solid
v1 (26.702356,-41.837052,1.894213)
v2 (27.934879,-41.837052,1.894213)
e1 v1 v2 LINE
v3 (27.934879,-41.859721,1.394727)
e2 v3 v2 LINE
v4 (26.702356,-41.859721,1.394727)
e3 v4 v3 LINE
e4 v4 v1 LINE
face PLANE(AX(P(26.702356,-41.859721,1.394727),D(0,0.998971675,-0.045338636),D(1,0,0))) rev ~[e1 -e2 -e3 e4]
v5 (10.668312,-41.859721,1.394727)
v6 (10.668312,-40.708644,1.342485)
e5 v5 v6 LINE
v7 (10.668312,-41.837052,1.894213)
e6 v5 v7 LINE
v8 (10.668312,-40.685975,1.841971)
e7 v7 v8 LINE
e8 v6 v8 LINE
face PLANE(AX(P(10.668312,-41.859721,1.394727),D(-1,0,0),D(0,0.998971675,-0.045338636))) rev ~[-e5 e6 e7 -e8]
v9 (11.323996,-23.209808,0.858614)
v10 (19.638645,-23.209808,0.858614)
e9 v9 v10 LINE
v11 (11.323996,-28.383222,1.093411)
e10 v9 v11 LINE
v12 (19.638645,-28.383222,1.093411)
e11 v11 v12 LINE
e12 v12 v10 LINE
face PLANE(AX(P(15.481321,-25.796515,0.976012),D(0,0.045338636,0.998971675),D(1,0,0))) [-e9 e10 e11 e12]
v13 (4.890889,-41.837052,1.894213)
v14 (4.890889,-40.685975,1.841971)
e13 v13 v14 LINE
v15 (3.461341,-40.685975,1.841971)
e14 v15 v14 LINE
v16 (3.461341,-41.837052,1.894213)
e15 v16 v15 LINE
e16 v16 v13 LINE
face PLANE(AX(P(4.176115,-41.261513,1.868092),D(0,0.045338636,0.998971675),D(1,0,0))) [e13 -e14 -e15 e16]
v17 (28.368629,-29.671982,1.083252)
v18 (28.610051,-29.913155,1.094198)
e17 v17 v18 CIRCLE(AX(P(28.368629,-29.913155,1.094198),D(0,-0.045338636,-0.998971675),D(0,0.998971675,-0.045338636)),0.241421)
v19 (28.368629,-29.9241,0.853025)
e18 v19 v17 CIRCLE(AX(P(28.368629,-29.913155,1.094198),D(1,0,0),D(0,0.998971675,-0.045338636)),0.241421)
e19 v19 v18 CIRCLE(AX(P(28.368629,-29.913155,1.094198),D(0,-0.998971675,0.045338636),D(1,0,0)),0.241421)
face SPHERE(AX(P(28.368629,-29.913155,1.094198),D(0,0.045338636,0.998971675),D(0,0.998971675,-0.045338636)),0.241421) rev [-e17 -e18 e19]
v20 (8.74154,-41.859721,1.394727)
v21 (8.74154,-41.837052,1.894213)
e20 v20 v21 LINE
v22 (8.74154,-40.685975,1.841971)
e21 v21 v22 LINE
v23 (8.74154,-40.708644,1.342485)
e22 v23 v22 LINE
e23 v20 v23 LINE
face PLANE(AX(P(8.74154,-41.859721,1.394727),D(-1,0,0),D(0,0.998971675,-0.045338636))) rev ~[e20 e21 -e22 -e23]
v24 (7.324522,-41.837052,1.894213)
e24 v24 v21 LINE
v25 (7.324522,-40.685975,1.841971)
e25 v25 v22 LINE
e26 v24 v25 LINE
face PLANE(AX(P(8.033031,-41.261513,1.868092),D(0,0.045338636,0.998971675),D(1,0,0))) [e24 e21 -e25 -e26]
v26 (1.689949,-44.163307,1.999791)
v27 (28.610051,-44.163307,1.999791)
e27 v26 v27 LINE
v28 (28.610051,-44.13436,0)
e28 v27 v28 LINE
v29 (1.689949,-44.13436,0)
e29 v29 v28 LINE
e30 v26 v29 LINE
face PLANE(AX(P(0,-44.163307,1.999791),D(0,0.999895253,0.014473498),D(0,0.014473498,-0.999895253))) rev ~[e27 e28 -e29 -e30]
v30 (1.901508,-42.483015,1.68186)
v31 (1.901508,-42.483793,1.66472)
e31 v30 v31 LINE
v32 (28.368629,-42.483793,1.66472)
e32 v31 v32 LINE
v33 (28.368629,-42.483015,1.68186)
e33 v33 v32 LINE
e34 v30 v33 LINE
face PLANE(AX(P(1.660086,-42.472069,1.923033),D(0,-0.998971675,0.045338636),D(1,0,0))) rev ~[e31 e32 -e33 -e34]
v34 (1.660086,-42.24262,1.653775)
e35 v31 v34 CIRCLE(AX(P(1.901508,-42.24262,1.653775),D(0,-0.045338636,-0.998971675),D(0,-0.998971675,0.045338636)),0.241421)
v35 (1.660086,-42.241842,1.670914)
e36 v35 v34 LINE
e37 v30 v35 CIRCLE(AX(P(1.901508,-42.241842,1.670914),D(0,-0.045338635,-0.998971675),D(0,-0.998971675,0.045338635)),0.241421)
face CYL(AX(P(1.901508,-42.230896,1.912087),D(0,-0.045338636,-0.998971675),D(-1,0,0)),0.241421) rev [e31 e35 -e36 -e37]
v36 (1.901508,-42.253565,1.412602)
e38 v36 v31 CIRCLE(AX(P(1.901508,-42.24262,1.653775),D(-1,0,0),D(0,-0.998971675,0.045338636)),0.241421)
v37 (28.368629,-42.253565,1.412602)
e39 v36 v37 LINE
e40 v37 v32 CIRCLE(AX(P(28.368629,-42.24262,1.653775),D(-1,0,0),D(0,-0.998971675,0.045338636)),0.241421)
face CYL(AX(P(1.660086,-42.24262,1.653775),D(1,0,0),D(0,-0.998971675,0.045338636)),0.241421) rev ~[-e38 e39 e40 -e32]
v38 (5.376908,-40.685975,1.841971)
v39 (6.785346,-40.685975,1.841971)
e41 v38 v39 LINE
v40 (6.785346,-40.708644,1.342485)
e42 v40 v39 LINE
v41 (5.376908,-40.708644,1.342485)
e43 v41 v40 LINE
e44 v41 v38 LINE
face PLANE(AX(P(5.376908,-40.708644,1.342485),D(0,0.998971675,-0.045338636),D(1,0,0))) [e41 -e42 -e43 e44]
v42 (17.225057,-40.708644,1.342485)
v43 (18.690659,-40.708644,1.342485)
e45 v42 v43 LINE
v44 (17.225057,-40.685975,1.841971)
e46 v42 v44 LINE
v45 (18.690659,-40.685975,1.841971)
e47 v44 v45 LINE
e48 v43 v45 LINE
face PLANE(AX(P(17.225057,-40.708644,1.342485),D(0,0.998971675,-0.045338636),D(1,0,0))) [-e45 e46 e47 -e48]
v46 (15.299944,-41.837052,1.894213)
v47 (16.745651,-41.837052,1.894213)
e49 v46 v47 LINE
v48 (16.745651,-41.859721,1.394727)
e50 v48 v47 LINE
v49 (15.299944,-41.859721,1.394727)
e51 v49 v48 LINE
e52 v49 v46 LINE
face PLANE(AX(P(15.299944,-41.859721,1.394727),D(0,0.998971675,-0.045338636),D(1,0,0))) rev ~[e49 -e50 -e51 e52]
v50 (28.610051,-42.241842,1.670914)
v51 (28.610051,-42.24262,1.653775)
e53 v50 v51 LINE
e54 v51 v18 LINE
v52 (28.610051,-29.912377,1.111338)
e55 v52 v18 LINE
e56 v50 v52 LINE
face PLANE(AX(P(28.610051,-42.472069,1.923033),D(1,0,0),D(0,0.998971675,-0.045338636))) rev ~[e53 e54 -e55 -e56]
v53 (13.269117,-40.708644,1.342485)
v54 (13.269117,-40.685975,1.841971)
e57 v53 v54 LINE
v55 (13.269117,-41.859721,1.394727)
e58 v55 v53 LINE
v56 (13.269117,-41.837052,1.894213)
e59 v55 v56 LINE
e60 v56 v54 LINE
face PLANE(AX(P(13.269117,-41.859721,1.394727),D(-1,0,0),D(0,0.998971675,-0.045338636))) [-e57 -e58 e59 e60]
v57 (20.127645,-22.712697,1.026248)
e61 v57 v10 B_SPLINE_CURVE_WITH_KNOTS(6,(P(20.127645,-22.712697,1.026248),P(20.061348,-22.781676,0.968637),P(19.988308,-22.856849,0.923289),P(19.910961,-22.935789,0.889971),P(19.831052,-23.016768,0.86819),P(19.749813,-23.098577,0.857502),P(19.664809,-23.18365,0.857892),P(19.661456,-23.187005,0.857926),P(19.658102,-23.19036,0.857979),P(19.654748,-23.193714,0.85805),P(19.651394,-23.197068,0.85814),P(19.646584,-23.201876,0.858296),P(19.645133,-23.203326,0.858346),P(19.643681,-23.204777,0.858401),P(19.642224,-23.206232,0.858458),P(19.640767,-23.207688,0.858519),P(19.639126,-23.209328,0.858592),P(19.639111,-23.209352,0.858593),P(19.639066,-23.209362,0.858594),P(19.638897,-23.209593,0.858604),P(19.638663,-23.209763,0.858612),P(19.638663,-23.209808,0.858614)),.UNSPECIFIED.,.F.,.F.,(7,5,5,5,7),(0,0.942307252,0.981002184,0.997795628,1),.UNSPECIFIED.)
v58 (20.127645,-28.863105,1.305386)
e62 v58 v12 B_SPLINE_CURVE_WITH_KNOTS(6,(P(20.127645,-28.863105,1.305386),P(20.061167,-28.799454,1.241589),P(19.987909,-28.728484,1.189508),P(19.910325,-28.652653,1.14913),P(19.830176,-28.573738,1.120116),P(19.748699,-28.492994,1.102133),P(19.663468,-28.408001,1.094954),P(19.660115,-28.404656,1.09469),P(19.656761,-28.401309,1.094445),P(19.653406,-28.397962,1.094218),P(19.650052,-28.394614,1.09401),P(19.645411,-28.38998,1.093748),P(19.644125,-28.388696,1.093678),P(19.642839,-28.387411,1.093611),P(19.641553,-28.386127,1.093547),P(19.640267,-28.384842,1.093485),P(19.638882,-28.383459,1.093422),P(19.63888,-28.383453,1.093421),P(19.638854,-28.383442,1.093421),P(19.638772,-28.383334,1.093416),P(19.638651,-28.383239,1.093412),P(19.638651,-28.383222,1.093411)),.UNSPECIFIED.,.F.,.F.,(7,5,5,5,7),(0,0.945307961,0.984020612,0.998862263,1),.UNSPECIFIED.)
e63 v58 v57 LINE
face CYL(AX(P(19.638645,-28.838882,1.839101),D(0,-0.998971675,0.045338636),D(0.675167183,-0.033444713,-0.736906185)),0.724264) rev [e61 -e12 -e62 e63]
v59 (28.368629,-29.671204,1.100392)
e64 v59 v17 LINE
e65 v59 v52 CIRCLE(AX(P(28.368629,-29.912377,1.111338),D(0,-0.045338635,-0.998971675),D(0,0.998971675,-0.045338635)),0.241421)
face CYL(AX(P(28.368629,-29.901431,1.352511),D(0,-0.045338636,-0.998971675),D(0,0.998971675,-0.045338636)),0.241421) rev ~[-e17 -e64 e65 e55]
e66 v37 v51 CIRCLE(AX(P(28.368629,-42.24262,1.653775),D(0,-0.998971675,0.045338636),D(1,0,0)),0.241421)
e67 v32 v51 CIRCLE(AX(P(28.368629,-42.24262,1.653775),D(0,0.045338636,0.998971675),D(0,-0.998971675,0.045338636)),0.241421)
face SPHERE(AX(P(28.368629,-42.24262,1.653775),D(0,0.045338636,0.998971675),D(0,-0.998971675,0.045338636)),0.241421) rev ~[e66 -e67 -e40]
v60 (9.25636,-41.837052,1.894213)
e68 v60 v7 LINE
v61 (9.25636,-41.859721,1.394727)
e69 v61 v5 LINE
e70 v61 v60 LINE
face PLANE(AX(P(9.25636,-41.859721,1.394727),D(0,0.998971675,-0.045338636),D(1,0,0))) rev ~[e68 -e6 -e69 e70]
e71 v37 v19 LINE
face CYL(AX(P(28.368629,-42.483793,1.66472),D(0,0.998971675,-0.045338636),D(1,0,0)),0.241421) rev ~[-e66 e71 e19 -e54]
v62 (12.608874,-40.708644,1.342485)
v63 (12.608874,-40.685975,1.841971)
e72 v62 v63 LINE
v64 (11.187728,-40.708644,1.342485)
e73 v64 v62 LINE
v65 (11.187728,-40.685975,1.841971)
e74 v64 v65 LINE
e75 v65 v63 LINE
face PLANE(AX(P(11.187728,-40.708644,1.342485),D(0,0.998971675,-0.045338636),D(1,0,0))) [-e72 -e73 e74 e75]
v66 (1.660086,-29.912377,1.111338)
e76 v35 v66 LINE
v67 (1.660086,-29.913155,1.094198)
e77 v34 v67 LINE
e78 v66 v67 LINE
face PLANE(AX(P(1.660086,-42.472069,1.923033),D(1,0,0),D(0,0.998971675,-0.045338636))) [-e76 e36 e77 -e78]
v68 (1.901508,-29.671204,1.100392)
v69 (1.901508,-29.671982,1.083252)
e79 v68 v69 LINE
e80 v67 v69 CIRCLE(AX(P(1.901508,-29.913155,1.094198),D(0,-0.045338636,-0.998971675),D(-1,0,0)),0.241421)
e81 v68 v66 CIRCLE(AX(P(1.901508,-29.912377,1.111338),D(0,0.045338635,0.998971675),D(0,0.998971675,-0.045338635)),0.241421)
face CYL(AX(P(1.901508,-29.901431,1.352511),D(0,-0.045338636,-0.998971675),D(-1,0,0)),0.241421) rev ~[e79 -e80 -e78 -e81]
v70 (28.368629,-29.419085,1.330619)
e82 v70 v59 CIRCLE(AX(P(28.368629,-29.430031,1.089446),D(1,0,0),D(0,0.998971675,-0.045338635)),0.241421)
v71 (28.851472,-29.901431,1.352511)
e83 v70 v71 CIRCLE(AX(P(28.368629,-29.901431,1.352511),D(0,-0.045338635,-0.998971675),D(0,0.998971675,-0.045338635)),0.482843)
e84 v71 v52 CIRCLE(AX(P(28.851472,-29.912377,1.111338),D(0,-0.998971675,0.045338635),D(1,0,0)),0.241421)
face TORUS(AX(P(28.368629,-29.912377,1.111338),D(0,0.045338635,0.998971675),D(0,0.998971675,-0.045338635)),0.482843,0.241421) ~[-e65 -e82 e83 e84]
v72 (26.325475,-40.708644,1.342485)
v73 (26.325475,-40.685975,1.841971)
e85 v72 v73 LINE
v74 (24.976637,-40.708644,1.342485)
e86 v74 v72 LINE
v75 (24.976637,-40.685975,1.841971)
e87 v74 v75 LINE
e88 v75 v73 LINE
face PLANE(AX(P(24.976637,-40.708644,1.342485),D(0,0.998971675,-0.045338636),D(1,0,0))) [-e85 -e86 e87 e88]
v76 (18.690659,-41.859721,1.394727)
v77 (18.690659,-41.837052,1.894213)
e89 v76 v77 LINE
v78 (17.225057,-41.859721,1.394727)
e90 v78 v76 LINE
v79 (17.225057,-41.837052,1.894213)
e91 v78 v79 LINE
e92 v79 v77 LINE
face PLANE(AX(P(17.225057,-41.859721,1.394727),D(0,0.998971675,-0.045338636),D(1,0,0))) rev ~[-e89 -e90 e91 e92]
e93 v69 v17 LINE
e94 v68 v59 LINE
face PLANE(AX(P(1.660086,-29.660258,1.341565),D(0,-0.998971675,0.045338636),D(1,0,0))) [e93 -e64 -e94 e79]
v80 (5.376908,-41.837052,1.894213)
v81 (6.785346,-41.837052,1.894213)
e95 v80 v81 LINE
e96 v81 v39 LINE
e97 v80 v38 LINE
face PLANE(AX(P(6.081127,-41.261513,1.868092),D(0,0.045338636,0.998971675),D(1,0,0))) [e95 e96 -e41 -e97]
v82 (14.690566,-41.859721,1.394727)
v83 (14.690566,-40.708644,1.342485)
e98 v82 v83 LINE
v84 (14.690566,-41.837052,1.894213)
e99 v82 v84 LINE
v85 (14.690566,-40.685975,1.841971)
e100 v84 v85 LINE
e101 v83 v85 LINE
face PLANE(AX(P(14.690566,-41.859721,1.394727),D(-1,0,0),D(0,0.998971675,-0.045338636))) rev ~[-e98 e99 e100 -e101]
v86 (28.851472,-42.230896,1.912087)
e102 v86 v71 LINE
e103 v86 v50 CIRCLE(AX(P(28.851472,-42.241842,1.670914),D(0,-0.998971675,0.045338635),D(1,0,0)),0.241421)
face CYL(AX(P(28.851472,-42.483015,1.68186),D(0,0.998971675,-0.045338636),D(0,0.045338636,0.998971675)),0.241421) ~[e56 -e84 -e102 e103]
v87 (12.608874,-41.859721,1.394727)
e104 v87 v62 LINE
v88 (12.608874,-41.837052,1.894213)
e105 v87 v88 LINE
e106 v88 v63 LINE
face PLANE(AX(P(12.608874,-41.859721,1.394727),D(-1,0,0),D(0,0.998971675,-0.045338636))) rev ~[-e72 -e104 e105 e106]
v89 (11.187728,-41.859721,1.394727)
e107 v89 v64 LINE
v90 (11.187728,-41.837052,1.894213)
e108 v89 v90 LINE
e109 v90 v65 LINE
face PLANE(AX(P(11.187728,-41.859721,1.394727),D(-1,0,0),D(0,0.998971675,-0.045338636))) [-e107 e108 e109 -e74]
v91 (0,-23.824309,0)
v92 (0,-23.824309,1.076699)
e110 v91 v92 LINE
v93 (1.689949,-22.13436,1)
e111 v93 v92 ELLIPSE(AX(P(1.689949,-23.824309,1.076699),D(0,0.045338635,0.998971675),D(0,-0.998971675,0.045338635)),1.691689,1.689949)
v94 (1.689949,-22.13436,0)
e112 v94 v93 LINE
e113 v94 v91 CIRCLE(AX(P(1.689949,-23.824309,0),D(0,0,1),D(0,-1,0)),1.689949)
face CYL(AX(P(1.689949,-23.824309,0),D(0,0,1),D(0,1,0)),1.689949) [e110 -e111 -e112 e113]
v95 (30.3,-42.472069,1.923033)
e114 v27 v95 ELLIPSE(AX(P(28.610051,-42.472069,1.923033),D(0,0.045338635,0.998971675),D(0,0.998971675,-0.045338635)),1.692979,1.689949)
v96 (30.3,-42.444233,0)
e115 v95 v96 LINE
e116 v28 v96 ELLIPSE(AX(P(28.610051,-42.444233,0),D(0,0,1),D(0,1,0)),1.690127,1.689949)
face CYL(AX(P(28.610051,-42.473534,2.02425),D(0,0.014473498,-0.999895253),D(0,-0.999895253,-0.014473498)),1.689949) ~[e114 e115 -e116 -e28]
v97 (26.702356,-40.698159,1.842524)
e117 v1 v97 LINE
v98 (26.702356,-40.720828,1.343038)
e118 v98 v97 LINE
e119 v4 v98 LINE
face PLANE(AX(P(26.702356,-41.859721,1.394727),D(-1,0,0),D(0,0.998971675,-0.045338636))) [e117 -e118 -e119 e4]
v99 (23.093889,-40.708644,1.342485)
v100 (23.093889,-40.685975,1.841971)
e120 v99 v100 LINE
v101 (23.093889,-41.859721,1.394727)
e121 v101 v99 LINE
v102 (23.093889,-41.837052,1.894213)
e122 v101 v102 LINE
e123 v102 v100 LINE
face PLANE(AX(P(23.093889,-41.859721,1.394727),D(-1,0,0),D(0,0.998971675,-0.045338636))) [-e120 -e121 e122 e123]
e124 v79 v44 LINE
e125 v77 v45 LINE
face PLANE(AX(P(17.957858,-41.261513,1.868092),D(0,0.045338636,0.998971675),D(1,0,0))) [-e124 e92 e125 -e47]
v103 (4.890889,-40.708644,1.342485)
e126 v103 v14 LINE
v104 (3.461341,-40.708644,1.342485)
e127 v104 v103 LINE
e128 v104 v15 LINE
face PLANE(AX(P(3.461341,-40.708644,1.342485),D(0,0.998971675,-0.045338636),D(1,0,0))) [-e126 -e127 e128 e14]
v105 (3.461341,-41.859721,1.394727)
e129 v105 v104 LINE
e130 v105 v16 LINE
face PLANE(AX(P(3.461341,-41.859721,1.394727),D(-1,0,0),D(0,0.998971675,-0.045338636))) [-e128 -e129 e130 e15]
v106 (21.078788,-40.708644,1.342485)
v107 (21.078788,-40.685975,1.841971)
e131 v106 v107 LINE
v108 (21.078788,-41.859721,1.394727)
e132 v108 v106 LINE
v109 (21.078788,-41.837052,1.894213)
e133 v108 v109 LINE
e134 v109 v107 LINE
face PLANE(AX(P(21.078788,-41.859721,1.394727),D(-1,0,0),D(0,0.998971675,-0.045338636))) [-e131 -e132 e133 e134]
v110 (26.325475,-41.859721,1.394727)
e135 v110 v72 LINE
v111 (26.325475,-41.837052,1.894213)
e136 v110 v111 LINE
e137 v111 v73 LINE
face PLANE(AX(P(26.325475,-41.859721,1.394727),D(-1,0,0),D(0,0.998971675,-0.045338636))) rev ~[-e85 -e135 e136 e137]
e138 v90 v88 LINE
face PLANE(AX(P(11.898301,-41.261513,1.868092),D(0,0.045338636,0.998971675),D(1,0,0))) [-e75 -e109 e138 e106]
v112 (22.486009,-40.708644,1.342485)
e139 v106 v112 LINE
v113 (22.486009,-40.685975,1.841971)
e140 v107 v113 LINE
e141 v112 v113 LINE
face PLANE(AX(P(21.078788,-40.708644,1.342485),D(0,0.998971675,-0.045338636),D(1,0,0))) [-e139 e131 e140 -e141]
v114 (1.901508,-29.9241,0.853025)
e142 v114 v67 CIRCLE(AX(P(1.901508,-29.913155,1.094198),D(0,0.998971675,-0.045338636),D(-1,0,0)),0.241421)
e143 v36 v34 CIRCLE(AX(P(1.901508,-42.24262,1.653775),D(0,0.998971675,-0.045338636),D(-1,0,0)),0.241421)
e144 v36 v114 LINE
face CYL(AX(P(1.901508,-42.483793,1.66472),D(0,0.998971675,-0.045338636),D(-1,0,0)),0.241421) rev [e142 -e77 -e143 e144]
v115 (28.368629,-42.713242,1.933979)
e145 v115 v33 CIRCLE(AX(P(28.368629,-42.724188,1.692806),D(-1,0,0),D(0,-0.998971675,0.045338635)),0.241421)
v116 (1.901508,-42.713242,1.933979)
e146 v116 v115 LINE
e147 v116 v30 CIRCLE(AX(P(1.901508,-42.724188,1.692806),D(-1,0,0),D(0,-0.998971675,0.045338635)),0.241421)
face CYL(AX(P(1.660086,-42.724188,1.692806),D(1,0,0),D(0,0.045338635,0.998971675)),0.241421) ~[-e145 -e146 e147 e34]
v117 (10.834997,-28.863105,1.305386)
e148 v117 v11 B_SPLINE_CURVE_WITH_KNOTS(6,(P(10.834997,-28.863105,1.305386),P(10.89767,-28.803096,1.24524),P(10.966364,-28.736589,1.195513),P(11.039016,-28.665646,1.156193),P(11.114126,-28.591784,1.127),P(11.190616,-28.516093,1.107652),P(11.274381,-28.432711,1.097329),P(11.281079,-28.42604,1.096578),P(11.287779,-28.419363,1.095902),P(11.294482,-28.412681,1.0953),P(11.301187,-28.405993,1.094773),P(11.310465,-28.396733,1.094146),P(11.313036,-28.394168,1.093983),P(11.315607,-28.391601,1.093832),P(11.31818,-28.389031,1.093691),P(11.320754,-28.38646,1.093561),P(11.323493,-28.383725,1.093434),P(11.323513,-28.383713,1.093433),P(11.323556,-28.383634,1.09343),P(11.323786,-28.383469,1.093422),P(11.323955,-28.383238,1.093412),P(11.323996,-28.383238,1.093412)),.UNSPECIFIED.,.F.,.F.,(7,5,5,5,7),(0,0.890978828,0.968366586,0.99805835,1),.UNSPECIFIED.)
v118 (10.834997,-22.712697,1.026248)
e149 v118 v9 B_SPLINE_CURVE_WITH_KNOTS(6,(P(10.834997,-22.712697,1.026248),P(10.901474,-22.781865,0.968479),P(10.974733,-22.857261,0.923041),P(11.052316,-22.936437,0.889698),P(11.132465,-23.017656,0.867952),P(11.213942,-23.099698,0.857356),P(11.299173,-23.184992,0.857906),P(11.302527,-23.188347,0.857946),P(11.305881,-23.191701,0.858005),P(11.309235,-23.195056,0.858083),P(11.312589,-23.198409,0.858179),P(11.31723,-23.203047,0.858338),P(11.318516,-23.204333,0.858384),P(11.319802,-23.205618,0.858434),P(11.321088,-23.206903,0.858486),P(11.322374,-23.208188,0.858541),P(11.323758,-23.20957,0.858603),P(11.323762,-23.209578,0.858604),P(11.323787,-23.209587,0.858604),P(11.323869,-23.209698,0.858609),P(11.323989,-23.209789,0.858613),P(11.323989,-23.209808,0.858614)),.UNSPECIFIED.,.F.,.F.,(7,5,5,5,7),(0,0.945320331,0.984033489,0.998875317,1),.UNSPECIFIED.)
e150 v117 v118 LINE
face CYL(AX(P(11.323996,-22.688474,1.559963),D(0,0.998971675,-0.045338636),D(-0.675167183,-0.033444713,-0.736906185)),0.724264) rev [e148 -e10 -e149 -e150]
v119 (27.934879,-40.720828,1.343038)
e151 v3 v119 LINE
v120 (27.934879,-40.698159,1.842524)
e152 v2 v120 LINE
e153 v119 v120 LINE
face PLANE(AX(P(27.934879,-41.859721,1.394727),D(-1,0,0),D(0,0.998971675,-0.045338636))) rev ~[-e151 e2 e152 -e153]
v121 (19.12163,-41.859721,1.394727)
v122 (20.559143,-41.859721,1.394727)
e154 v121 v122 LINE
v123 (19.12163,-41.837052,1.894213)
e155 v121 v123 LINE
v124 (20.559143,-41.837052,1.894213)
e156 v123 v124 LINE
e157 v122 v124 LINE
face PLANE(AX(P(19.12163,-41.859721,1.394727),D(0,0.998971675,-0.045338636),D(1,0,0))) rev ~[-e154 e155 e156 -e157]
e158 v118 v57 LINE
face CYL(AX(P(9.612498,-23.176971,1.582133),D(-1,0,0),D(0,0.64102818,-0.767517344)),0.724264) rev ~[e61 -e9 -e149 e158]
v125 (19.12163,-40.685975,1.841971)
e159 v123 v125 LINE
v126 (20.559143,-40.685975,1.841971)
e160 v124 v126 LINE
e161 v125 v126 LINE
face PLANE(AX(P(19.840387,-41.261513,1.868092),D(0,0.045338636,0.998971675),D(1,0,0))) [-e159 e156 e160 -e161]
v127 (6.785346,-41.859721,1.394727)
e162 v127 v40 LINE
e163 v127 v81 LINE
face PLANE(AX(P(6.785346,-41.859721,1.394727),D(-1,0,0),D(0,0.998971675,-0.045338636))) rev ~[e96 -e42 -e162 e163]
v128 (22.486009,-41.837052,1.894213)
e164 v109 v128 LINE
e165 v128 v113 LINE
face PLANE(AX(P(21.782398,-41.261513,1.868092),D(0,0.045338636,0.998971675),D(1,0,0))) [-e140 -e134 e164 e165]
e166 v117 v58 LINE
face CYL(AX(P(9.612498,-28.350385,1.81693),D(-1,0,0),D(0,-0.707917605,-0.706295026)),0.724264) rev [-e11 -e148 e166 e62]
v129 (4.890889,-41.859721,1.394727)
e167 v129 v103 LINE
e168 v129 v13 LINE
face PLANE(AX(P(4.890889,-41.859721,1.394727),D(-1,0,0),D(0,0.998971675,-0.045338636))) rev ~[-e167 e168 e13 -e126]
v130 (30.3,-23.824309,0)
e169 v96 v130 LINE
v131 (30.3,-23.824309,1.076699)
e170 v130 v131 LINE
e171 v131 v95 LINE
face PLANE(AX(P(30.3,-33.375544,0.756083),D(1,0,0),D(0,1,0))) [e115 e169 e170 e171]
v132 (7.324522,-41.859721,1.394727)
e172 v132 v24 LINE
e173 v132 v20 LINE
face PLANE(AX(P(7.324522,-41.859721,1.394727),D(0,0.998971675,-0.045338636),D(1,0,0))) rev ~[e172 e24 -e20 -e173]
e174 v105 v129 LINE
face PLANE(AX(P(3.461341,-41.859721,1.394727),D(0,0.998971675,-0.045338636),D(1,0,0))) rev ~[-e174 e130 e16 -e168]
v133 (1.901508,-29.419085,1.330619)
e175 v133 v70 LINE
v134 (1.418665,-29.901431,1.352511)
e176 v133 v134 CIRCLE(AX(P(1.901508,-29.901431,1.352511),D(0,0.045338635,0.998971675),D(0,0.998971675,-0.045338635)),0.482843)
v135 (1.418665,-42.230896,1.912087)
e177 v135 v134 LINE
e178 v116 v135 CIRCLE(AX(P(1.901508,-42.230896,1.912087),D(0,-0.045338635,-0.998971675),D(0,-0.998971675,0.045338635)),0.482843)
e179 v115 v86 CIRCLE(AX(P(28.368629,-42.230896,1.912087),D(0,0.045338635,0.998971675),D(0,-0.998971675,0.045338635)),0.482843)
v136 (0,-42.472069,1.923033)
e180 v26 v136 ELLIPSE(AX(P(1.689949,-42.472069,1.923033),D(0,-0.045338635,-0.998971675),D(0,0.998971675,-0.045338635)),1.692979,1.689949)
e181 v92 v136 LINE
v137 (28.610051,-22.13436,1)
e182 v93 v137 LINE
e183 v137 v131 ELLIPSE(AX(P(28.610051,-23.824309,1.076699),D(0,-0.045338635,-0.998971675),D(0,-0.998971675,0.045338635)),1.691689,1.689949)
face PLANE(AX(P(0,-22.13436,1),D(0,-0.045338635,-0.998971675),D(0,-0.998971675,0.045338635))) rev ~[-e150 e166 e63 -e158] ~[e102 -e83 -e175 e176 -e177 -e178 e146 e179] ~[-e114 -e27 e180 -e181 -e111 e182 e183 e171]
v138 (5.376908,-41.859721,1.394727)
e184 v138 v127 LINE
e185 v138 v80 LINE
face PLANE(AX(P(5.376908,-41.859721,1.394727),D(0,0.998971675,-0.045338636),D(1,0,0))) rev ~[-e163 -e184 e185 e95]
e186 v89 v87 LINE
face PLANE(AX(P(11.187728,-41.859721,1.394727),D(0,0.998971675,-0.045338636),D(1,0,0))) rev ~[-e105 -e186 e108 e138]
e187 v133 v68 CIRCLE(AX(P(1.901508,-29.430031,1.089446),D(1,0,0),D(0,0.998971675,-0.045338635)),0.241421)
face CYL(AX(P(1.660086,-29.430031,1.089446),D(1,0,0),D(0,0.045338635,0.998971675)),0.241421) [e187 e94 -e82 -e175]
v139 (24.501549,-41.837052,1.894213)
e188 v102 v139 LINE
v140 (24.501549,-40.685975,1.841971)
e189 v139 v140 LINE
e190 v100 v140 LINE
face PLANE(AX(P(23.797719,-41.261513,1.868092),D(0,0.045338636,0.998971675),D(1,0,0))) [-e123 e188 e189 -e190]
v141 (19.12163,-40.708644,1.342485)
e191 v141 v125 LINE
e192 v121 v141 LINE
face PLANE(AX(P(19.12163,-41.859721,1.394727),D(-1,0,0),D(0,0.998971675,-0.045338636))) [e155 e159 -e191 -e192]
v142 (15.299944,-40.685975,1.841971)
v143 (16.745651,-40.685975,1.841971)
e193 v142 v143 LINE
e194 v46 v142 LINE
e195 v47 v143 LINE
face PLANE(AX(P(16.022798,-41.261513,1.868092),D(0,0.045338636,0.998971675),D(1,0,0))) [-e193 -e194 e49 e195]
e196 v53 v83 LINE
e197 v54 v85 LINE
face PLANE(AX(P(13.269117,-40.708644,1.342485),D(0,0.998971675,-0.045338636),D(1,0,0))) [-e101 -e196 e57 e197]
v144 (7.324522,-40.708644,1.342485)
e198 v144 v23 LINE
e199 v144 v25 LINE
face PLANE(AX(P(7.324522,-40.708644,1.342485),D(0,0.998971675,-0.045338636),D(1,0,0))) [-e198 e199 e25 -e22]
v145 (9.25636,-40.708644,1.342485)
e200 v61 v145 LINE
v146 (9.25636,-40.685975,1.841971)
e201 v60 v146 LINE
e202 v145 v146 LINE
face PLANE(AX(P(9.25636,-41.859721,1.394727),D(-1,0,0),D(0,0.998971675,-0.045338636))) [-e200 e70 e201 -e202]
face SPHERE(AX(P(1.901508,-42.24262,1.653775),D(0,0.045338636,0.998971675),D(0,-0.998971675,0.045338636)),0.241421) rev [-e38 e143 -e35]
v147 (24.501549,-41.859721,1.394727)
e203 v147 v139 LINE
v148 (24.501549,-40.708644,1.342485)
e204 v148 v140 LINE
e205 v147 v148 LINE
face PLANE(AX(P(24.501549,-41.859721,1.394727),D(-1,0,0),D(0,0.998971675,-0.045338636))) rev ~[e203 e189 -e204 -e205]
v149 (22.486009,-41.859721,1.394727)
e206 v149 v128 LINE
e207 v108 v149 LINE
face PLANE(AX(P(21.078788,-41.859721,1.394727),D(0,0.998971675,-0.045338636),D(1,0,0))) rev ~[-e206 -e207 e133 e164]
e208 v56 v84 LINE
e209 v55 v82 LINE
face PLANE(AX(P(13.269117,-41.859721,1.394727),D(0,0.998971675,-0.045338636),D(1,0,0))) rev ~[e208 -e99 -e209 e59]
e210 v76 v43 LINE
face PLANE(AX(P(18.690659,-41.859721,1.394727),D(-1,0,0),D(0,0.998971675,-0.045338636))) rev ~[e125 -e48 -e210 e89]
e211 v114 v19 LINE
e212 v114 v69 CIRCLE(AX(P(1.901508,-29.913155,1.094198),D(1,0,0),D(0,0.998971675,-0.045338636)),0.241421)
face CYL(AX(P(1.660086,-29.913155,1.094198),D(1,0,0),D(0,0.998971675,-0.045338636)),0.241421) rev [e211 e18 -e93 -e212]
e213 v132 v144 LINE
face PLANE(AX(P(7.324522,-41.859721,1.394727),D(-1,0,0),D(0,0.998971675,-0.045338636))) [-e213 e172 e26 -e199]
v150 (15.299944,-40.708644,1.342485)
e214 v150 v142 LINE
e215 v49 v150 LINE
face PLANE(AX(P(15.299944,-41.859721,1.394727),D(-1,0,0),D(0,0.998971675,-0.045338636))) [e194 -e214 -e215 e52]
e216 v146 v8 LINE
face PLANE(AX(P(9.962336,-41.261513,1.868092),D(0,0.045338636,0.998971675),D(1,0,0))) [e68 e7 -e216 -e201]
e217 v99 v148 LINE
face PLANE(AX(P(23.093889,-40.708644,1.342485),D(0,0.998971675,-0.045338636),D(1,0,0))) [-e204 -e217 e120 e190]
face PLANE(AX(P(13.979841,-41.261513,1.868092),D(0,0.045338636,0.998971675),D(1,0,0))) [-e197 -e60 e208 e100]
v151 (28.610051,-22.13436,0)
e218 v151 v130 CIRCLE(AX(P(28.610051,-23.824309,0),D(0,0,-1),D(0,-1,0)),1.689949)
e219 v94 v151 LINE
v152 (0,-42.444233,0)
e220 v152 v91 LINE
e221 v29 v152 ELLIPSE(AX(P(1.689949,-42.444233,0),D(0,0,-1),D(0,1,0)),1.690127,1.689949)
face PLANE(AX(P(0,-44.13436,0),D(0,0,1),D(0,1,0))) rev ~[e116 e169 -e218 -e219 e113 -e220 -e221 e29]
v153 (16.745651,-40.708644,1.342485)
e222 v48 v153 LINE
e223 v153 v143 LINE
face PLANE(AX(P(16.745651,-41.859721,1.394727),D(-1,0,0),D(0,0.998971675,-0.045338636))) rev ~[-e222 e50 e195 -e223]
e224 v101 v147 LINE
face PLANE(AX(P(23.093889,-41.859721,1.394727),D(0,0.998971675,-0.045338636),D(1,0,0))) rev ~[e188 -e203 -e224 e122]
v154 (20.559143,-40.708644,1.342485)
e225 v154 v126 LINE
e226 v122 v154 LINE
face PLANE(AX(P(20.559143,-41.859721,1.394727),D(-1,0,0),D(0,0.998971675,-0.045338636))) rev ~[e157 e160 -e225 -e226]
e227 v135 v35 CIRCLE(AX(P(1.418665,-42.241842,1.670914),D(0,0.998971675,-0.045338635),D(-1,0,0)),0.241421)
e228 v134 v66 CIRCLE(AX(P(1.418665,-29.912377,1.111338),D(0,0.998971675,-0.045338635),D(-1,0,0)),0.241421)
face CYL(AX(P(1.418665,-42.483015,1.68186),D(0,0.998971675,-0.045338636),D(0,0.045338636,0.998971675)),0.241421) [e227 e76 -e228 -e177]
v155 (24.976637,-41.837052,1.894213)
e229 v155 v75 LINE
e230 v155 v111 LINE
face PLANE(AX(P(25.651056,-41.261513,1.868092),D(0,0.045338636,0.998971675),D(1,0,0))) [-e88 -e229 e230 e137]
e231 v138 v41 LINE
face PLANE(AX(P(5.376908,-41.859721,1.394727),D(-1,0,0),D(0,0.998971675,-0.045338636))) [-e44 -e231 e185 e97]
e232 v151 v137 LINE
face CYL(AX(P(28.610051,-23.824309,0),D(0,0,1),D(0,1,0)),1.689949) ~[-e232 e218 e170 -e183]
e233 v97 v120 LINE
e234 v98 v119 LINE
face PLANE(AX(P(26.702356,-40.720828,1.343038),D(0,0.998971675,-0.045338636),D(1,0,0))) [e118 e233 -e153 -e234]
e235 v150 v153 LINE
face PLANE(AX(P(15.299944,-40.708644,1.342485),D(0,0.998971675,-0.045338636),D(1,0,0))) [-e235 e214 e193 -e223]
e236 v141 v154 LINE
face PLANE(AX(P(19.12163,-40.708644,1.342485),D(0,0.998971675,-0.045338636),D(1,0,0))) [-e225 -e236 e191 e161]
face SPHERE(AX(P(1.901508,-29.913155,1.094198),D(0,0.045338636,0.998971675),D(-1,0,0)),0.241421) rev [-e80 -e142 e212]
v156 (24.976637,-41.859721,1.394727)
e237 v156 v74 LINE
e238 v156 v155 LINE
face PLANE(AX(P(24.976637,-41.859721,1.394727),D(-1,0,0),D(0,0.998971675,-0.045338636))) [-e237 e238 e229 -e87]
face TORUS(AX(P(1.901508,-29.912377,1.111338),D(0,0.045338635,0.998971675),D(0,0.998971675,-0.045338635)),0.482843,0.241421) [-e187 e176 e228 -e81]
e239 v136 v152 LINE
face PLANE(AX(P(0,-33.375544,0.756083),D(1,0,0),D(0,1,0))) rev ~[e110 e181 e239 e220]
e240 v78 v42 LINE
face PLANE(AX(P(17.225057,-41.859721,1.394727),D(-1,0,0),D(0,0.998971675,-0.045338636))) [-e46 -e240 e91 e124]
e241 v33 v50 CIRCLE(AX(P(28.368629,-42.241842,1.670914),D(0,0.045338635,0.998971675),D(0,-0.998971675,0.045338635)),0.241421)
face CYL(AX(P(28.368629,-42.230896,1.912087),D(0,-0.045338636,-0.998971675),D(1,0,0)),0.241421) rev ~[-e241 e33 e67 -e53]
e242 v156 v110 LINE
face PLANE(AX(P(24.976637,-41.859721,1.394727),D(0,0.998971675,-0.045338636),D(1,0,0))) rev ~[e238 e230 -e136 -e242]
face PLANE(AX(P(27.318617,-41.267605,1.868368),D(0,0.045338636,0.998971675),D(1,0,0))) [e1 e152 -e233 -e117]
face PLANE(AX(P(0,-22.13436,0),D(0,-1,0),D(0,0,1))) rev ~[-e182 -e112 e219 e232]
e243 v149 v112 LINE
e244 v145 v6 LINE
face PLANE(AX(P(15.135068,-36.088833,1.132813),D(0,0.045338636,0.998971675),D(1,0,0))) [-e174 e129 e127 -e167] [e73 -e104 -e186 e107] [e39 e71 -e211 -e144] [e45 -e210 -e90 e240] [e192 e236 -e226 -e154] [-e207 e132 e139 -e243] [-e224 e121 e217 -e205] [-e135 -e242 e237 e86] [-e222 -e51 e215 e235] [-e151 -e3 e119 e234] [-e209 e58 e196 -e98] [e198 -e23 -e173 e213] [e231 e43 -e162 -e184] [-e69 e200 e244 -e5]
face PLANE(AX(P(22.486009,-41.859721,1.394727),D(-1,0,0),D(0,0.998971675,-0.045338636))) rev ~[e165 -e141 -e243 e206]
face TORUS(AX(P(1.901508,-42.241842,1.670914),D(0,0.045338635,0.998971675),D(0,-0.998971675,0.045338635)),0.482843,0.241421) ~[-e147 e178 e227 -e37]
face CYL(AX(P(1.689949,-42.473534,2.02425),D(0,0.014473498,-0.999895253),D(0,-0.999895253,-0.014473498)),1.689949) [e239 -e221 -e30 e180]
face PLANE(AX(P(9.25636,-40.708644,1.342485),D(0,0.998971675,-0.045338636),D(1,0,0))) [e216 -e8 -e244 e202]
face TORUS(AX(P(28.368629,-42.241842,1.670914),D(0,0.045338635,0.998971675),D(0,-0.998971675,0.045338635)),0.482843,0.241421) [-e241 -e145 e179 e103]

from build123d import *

# Parameters (mm, degrees)
F1_DEPTH     = 30.3
F2_R         = 1.6899494937
F3_W         = 26.949964059
F3_H         = 12.8249995296
F4_DEPTH     = 0.5
F5_R         = 0.2414213562
F6_W         = 1.2325234711
F6_H         = 1.1400654912
F6_W_2       = 1.3488382101
F6_H_2       = 1.1522620916
F6_W_3       = 1.4076605439
F6_W_4       = 1.4072209597
F6_W_5       = 1.4375131577
F6_W_6       = 1.4656018466
F6_W_7       = 1.4457069337
F6_W_8       = 1.4214487746
F6_W_9       = 1.4211460948
F6_W_10      = 1.4119520783
F6_W_11      = 1.4170180075
F6_W_12      = 1.4084377326
F6_W_13      = 1.4295475557
F7_DEPTH     = 0.5
F8_W         = 9.2926481739
F8_H         = 6.1567388475
F9_DEPTH     = 0.19
F10_T1_DEPTH = 11.7376448309
F10_T3_DEPTH = 6.1567388475
F10_T5_DEPTH = 6.1567388475


# Not quite as in the source:
# - a fillet or chamfer that OpenCascade refuses, or shapes differently, is made with other operations: its cross-section is extruded or revolved along the edge and cut away or added


with BuildPart() as f1:
    # F0 (on Right) → F1 (new body)
    with BuildSketch(Plane.YZ):
        Polygon((-44.1633068031, 1.9997905069), (-44.1343598068, 0), (-22.1343598068, 0), (-22.1343598068, 1), align=None)
    extrude(amount=F1_DEPTH)

    # F2
    f2_edges = [f1.edges().sort_by_distance(p)[0] for p in [
        (0, -22.13436, 0.5),
        (30.3, -22.13436, 0.5),
        (30.3, -44.148833, 0.999895),
        (0, -44.148833, 0.999895),
    ]]
    fillet(f2_edges, radius=F2_R)

    # F3 (on face) → F4 (cut)
    with BuildSketch(Plane(origin=(0, -0.0002071974, -0.0045652959), x_dir=(1, 0, 0), z_dir=(0, 0.0453386355, 0.9989716753))):
        with Locations((15.1350684769, -36.10308207)):
            Rectangle(F3_W, F3_H)
    extrude(amount=-F4_DEPTH, mode=Mode.SUBTRACT)

    # F5
    f5_edges = [f1.edges().sort_by_distance(p)[0] for p in [
        (1.660086, -42.483404, 1.67329),
        (28.610051, -42.483404, 1.67329),
        (15.135068, -42.472069, 1.923033),
        (15.135068, -42.494739, 1.423547),
        (1.660086, -36.066164, 1.632299),
        (1.660086, -29.671593, 1.091822),
        (1.660086, -36.088833, 1.132813),
        (28.610051, -29.671593, 1.091822),
        (15.135068, -29.660258, 1.341565),
        (15.135068, -29.682927, 0.842079),
        (28.610051, -36.066164, 1.632299),
        (28.610051, -36.088833, 1.132813),
    ]]
    fillet(f5_edges, radius=F5_R)

    # F6 (on face) → F7 (join)
    with BuildSketch(Plane(origin=(0, -0.0228765151, -0.5040511335), x_dir=(1, 0, 0), z_dir=(0, 0.0453386355, 0.9989716753))):
        with Locations((27.318617329, -41.3098782301)):
            Rectangle(F6_W, F6_H)
        with Locations((25.6510563195, -41.3037799299)):
            Rectangle(F6_W_2, F6_H_2)
        with Locations((23.7977188081, -41.3037799299)):
            Rectangle(F6_W_3, F6_H_2)
        with Locations((21.7823982239, -41.3037799299)):
            Rectangle(F6_W_4, F6_H_2)
        with Locations((19.8403866962, -41.3037799299)):
            Rectangle(F6_W_5, F6_H_2)
        with Locations((17.95785781, -41.3037799299)):
            Rectangle(F6_W_6, F6_H_2)
        with Locations((16.0227976739, -41.3037799299)):
            Rectangle(F6_W_7, F6_H_2)
        with Locations((13.9798414893, -41.3037799299)):
            Rectangle(F6_W_8, F6_H_2)
        with Locations((11.8983006105, -41.3037799299)):
            Rectangle(F6_W_9, F6_H_2)
        with Locations((9.9623361602, -41.3037799299)):
            Rectangle(F6_W_10, F6_H_2)
        with Locations((8.0330308992, -41.3037799299)):
            Rectangle(F6_W_11, F6_H_2)
        with Locations((6.0811268631, -41.3037799299)):
            Rectangle(F6_W_12, F6_H_2)
        with Locations((4.1761151515, -41.3037799299)):
            Rectangle(F6_W_13, F6_H_2)
    extrude(amount=F7_DEPTH)

    # F8 (on face) → F9 (cut)
    with BuildSketch(Plane(origin=(0, -0.0002071974, -0.0045652959), x_dir=(1, 0, 0), z_dir=(0, 0.0453386355, 0.9989716753))):
        with Locations((15.4813206755, -25.8142389357)):
            Rectangle(F8_W, F8_H)
    extrude(amount=-F9_DEPTH, mode=Mode.SUBTRACT)

    # F10: fillet of radius 0.7242640687 on 4 edges, made by hand

    # F10_s2 → F10_t1 (join)
    with BuildSketch(Plane.YZ.offset(9.61249826)):
        with BuildLine():
            ThreePointArc((-28.8631045752, 1.3053861423), (-28.6430306792, 1.1544220499), (-28.3832224346, 1.0934109616))
            Line((-28.3832224346, 1.0934109616), (-28.8717189159, 1.115581524))
            Line((-28.8717189159, 1.115581524), (-28.8631045752, 1.3053861423))
        make_face()
        with BuildLine():
            ThreePointArc((-22.7126968541, 1.026248004), (-22.945540921, 0.8958397321), (-23.2098076761, 0.8586139482))
            Line((-23.2098076761, 0.8586139482), (-22.7213111948, 0.8364433857))
            Line((-22.7213111948, 0.8364433857), (-22.7126968541, 1.026248004))
        make_face()
    extrude(amount=F10_T1_DEPTH)

    # F10_s4 → F10_t3 (join)
    with BuildSketch(Plane(origin=(0, -22.7124896567, 1.0308132999), x_dir=(1, 0, 0), z_dir=(0, -0.9989716753, 0.0453386355))):
        with BuildLine():
            ThreePointArc((10.8349965885, -0.0045699953), (11.061688683, -0.1454009974), (11.3239959199, -0.1945699953))
            Line((11.3239959199, -0.1945699953), (10.8349965885, -0.1945699953))
            Line((10.8349965885, -0.1945699953), (10.8349965885, -0.0045699953))
        make_face()
    extrude(amount=F10_T3_DEPTH)

    # F10_s6 → F10_t5 (join)
    with BuildSketch(Plane(origin=(0, -28.8628973778, 1.3099514382), x_dir=(1, 0, 0), z_dir=(0, 0.9989716753, -0.0453386355))):
        with BuildLine():
            ThreePointArc((20.1276447624, 0.0045699953), (19.9009526679, 0.1454009974), (19.638645431, 0.1945699953))
            Line((19.638645431, 0.1945699953), (20.1276447624, 0.1945699953))
            Line((20.1276447624, 0.1945699953), (20.1276447624, 0.0045699953))
        make_face()
    extrude(amount=F10_T5_DEPTH)


solid = f1.part
